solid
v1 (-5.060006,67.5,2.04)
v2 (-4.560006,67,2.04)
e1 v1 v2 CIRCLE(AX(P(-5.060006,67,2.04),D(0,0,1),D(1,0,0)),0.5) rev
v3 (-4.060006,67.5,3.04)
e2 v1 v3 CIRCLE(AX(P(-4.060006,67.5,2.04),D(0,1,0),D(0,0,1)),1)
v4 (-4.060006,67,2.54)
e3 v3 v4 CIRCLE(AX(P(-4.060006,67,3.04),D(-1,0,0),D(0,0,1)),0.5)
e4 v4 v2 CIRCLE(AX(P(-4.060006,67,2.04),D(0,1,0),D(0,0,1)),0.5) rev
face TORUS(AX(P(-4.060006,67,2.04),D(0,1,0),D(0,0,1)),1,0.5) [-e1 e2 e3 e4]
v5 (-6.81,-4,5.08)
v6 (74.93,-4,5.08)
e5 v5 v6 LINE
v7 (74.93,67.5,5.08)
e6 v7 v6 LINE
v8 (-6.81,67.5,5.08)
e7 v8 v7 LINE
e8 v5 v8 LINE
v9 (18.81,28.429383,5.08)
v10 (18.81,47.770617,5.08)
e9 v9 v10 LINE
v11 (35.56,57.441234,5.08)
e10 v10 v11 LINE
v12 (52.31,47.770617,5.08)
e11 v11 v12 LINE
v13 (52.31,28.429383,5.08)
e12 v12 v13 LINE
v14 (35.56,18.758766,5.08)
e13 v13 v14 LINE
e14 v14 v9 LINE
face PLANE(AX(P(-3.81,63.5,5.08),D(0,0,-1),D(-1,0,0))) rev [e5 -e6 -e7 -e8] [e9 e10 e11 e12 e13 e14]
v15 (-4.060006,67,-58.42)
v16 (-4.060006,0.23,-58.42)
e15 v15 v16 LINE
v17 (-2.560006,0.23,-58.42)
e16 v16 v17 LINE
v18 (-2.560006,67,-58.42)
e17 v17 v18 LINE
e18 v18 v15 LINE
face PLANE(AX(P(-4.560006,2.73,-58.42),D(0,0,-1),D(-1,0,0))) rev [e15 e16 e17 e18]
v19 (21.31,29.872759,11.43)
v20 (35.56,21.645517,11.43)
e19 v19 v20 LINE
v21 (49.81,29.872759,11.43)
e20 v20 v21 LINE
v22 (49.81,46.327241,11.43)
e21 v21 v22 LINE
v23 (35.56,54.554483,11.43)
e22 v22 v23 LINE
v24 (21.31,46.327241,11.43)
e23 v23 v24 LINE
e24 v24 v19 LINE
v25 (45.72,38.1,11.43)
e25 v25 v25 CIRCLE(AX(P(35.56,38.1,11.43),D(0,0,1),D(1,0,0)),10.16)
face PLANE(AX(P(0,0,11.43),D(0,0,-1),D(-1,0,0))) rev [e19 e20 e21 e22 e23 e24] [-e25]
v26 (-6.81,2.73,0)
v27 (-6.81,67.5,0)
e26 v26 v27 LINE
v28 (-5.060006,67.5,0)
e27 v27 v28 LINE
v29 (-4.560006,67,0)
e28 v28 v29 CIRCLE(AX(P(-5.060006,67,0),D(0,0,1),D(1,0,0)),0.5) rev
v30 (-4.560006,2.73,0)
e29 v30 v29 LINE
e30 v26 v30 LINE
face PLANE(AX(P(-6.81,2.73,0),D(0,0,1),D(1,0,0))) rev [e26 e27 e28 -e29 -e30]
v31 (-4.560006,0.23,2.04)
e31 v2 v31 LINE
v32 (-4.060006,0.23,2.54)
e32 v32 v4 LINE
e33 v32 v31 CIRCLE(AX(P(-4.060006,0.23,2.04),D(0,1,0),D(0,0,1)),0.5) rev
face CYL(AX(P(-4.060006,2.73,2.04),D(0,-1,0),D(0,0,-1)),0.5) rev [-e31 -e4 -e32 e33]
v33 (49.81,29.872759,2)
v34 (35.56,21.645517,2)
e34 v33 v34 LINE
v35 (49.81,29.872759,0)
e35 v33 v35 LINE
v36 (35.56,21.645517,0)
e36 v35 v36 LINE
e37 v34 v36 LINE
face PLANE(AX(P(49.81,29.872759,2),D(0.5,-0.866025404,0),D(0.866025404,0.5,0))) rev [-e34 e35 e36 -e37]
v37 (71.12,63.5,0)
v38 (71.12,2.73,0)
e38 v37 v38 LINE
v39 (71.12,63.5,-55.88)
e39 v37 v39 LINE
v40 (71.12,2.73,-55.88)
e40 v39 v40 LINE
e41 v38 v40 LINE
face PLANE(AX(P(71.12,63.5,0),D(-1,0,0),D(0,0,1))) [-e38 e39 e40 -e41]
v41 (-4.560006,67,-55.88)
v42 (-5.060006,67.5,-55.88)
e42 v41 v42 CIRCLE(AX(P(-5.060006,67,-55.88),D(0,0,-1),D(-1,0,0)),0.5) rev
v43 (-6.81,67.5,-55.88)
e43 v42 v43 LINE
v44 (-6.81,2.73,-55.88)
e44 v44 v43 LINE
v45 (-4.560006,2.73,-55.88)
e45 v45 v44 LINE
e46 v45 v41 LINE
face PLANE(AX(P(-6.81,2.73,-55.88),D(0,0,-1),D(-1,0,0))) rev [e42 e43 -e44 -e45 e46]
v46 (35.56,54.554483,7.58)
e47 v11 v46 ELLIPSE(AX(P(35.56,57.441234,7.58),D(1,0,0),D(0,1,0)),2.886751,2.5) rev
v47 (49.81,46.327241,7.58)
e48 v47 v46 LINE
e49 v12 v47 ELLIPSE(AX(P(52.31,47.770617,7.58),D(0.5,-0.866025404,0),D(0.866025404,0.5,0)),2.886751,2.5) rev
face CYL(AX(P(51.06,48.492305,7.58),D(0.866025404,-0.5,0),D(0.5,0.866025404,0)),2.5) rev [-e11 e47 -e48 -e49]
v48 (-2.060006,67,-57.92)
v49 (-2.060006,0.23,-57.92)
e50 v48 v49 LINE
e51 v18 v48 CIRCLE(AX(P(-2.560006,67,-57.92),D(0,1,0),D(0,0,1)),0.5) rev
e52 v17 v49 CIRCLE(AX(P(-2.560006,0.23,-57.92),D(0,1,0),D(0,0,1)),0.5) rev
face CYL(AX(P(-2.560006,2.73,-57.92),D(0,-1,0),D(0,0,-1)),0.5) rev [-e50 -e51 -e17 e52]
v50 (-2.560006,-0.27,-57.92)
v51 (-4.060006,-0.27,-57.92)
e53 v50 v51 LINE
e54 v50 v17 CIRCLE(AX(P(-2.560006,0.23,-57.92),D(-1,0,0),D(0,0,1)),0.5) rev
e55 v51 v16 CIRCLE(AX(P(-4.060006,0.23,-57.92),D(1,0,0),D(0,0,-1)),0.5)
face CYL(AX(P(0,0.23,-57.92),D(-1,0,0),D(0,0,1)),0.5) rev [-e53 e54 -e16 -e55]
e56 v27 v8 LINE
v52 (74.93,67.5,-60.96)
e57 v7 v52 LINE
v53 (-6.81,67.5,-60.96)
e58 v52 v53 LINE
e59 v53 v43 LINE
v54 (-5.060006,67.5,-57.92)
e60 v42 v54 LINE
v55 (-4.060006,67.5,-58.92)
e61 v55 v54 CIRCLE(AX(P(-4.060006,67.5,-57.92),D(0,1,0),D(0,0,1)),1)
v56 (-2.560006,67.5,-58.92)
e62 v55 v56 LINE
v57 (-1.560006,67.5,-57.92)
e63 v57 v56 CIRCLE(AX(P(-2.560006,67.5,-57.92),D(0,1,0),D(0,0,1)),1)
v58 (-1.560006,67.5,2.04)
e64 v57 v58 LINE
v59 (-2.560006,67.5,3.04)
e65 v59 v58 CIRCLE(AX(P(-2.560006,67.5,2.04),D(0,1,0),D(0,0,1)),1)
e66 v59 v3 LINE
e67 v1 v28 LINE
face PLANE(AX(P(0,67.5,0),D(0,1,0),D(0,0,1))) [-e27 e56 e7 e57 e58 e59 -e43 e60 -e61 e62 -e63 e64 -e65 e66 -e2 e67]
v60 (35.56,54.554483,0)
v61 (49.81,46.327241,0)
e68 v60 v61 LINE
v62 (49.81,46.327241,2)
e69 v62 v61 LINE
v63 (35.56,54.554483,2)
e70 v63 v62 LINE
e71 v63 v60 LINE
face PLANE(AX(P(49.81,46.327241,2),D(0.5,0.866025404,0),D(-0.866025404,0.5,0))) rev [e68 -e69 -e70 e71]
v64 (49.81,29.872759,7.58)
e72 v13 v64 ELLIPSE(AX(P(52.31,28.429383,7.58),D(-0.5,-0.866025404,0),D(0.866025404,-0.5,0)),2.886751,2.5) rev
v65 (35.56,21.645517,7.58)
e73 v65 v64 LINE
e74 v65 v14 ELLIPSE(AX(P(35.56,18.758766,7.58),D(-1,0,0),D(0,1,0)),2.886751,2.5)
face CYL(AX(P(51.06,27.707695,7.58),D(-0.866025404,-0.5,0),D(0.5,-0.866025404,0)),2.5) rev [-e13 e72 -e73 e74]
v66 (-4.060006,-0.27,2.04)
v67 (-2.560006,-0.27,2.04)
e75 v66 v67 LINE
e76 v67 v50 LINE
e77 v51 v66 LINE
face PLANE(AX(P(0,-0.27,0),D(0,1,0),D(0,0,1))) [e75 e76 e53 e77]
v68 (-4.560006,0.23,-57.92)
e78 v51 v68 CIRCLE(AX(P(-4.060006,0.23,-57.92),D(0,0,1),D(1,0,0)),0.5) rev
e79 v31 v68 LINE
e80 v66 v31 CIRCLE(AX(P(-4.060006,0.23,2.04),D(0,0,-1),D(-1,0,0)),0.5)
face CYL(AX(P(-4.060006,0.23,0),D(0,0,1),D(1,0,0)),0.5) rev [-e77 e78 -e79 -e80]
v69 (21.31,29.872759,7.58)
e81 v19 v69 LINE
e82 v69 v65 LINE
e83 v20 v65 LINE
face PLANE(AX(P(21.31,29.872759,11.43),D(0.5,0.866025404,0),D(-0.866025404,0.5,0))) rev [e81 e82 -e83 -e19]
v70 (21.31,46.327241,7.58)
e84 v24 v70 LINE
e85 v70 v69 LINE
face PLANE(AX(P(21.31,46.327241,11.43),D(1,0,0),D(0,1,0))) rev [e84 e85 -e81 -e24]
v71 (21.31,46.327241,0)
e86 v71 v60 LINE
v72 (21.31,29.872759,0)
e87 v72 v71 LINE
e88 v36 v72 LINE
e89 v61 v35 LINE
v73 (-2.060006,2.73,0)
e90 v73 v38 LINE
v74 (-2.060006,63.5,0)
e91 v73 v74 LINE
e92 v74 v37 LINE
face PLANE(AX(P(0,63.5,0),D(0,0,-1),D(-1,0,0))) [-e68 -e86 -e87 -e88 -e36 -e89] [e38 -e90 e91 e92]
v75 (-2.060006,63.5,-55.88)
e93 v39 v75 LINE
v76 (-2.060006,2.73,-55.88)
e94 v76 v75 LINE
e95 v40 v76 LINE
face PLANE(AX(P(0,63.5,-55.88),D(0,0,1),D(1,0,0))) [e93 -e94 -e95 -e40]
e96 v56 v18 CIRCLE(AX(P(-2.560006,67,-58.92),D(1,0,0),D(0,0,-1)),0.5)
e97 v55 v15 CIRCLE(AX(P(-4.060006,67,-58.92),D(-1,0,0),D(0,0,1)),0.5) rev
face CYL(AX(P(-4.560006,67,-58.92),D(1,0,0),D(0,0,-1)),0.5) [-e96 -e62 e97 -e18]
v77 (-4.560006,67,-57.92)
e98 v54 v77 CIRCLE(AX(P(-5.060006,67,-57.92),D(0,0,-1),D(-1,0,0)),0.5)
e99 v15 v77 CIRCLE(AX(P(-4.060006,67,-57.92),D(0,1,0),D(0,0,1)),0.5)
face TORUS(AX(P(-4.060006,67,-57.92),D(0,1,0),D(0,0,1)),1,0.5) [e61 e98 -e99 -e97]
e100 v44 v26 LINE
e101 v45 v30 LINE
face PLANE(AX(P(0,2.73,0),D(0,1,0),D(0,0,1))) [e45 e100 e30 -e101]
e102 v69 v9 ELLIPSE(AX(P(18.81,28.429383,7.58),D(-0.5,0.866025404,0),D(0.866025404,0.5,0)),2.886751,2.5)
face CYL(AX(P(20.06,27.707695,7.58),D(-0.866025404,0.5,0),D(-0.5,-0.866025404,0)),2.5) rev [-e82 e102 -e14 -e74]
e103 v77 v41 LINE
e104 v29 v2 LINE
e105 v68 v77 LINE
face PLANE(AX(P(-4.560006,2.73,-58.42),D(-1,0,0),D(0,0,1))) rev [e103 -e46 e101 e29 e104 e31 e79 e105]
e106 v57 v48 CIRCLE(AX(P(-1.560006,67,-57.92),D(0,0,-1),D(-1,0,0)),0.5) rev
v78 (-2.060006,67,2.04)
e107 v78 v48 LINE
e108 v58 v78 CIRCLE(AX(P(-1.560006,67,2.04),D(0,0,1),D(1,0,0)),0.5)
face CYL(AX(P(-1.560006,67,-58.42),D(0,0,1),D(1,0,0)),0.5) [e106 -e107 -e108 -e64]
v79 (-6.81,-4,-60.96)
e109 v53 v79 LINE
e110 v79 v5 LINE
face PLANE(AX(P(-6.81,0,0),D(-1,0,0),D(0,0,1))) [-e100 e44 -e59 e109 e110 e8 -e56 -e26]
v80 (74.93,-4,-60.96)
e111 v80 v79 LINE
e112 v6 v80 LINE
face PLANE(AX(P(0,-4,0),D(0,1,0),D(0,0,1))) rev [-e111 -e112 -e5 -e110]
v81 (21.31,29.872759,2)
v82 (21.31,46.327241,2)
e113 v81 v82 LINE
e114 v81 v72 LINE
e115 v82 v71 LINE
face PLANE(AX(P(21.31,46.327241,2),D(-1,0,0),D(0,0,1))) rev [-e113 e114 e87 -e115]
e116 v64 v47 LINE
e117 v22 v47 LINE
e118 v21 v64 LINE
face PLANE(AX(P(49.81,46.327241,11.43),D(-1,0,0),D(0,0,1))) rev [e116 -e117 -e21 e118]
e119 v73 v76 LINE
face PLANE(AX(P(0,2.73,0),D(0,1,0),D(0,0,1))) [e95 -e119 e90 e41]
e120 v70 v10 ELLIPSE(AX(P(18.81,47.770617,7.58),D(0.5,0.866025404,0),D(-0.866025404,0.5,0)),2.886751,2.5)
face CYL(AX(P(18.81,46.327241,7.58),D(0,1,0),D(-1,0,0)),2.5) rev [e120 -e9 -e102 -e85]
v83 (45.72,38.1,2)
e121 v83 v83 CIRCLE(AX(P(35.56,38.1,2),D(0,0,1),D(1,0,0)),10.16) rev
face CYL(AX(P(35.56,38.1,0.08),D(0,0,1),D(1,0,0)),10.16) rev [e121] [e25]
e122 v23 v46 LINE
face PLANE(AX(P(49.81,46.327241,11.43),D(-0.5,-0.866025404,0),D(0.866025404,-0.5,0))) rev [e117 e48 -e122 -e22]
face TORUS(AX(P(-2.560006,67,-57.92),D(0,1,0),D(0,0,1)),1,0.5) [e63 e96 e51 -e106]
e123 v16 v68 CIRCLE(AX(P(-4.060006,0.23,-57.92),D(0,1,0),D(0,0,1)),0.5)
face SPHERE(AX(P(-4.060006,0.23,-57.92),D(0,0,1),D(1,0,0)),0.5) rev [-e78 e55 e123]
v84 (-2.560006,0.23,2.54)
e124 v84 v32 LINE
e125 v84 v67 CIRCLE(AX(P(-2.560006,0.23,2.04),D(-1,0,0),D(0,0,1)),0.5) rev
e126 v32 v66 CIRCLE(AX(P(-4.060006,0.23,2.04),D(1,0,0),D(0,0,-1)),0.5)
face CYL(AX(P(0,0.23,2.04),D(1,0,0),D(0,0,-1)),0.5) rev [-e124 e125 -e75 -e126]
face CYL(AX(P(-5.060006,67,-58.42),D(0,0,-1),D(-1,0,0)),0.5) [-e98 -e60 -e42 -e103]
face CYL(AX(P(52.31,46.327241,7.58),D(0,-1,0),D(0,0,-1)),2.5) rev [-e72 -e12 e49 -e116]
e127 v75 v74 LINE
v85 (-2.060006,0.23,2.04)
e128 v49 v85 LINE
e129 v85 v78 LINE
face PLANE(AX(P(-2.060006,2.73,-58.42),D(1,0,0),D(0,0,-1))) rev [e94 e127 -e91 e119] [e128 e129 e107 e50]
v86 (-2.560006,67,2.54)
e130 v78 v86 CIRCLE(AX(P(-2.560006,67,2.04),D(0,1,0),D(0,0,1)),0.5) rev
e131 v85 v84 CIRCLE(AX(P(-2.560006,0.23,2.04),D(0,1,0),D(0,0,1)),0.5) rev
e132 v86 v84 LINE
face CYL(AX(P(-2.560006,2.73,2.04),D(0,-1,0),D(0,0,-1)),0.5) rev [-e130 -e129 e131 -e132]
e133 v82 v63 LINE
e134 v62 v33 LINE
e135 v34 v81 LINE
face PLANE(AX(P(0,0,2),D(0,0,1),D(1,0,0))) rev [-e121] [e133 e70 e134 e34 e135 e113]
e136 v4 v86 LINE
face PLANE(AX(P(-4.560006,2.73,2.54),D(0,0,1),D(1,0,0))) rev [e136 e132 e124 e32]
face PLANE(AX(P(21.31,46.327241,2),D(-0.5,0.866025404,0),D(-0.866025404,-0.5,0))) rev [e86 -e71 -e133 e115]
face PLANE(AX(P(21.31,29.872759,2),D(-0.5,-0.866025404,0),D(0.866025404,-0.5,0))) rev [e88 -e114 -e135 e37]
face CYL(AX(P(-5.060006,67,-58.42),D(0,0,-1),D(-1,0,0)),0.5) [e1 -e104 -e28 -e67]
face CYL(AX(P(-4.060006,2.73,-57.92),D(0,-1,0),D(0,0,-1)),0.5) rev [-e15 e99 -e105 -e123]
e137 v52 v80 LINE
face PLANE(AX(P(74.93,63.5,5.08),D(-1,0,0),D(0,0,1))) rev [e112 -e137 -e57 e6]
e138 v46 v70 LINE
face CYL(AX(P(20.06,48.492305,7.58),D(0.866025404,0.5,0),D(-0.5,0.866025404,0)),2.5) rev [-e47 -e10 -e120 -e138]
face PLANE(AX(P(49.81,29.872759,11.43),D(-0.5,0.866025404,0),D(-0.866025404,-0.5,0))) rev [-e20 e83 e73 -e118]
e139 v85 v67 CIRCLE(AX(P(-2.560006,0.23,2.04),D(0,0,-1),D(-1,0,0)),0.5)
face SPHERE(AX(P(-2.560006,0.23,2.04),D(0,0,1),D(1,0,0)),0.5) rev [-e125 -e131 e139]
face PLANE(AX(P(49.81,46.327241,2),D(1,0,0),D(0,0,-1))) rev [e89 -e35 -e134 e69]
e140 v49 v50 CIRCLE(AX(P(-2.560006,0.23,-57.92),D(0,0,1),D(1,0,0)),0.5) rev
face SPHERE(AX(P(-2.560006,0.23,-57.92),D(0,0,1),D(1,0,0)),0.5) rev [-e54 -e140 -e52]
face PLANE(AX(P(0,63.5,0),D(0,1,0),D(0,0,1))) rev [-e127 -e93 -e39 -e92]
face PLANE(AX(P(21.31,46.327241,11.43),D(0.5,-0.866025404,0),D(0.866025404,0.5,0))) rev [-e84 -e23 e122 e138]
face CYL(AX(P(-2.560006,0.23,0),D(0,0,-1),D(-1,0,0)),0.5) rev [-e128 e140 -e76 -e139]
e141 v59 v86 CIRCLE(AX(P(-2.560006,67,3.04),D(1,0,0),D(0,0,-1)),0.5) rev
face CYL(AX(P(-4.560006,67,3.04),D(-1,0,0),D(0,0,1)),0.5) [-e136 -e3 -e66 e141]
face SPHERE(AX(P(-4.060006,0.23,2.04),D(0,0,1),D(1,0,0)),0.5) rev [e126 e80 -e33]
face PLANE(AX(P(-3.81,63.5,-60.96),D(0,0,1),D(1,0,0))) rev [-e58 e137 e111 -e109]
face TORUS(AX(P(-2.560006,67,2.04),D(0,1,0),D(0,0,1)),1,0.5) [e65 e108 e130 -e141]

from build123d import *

# Parameters (mm, degrees)
SKETCH1_W            = 78.74
SKETCH1_H            = 66.04
SKETCH1_W_2          = 71.12
SKETCH1_H_2          = 55.88
BOSS_EXTRUDE1_DEPTH  = 63.5
SKETCH2_W            = 78.74
SKETCH2_H            = 66.04
BOSS_EXTRUDE2_DEPTH  = 4
CUT_EXTRUDE1_REACH   = 120.103
SKETCH3_W            = 13.462
SKETCH3_H            = 13.97
CUT_EXTRUDE2_REACH   = 120.103
SKETCH4_W            = 10.922
SKETCH4_H            = 13.97
SKETCH16_W           = 66.04
SKETCH16_H           = 67.5
SKETCH16_W_2         = 13.462
SKETCH16_H_2         = 13.97
SKETCH16_W_3         = 10.922
BOSS_EXTRUDE8_DEPTH  = 3
SKETCH17_W           = 81.74
SKETCH17_H           = 66.04
BOSS_EXTRUDE9_DEPTH  = 4
CUT_EXTRUDE10_DEPTH  = 64.77
SKETCH19_W           = 2.5
SKETCH19_H           = 60.96
CUT_EXTRUDE11_DEPTH  = 3
SKETCH20_W           = 55.88
SKETCH20_H           = 4
BOSS_EXTRUDE10_DEPTH = 2.25
SKETCH21_W           = 71.12
SKETCH21_H           = 55.88
BOSS_EXTRUDE11_DEPTH = 2.73
FILLET2_R            = 0.5
BOSS_EXTRUDE12_DEPTH = 6.35
SKETCH22_R           = 10.16
CUT_EXTRUDE12_DEPTH  = 11.35
CUT_EXTRUDE13_DEPTH  = 2
FILLET3_R            = 2.5


with BuildPart() as part:
    # Sketch1 → Boss-Extrude1 (new body)
    with BuildSketch(Plane(origin=(0, 0, 0), x_dir=(1, 0, 0), z_dir=(0, 1, 0))):
        with Locations((35.56, 27.94)):
            Rectangle(SKETCH1_W, SKETCH1_H)
        with Locations((35.56, 27.94)):
            Rectangle(SKETCH1_W_2, SKETCH1_H_2, mode=Mode.SUBTRACT)
    extrude(amount=BOSS_EXTRUDE1_DEPTH)

    # Sketch2 → Boss-Extrude2 (add)
    with BuildSketch(Plane(origin=(0, 0, 0), x_dir=(1, 0, 0), z_dir=(0, 1, 0))):
        with Locations((35.56, 27.94)):
            Rectangle(SKETCH2_W, SKETCH2_H)
    extrude(amount=-BOSS_EXTRUDE2_DEPTH)

    # Sketch3 → Cut-Extrude1 (cut, up to next)
    with BuildSketch(Plane.ZY.offset(3.81), mode=Mode.PRIVATE) as cut_extrude1_sk1:
        with Locations((-40.729, 11.875)):
            Rectangle(SKETCH3_W, SKETCH3_H)
    cut_extrude1_tool1 = extrude(cut_extrude1_sk1.sketch, amount=-CUT_EXTRUDE1_REACH, mode=Mode.PRIVATE) & part.part
    add(cut_extrude1_tool1.solids().sort_by_distance((-3.81, 11.875, -40.729))[0], mode=Mode.SUBTRACT)

    # Sketch4 → Cut-Extrude2 (cut, up to next)
    with BuildSketch(Plane.ZY.offset(3.81), mode=Mode.PRIVATE) as cut_extrude2_sk1:
        with Locations((-8.001, 11.875)):
            Rectangle(SKETCH4_W, SKETCH4_H)
    cut_extrude2_tool1 = extrude(cut_extrude2_sk1.sketch, amount=-CUT_EXTRUDE2_REACH, mode=Mode.PRIVATE) & part.part
    add(cut_extrude2_tool1.solids().sort_by_distance((-3.81, 11.875, -8.001))[0], mode=Mode.SUBTRACT)

    # Sketch16 → Boss-Extrude8 (add)
    with BuildSketch(Plane.ZY.offset(3.81)):
        with Locations((-27.94, 29.75)):
            Rectangle(SKETCH16_W, SKETCH16_H)
        with Locations((-40.729, 11.875)):
            Rectangle(SKETCH16_W_2, SKETCH16_H_2, mode=Mode.SUBTRACT)
        with Locations((-8.001, 11.875)):
            Rectangle(SKETCH16_W_3, SKETCH16_H_2, mode=Mode.SUBTRACT)
    extrude(amount=BOSS_EXTRUDE8_DEPTH)

    # Sketch17 → Boss-Extrude9 (add)
    with BuildSketch(Plane(origin=(0, 63.5, 0), x_dir=(1, 0, 0), z_dir=(0, 1, 0))):
        with Locations((34.06, 27.94)):
            Rectangle(SKETCH17_W, SKETCH17_H)
    extrude(amount=BOSS_EXTRUDE9_DEPTH)

    # Sketch18 → Cut-Extrude10 (cut)
    with BuildSketch(Plane(origin=(0, 67.5, 0), x_dir=(1, 0, 0), z_dir=(0, 1, 0))):
        Polygon((-4.560006, 58.42), (-2.060006, 58.42), (-2.060006, 55.88), (0.189988, 55.88), (0.189988, 0), (-2.060006, 0), (-2.060006, -2.54), (-4.560006, -2.54), (-4.560006, 0), (-6.81, 0), (-6.81, 55.88), (-4.560006, 55.88), align=None)
    extrude(amount=-CUT_EXTRUDE10_DEPTH, mode=Mode.SUBTRACT)

    # Sketch19 → Cut-Extrude11 (cut)
    with BuildSketch(Plane(origin=(0, 2.73, 0), x_dir=(1, 0, 0), z_dir=(0, 1, 0))):
        with Locations((-3.310006, 27.94)):
            Rectangle(SKETCH19_W, SKETCH19_H)
    extrude(amount=-CUT_EXTRUDE11_DEPTH, mode=Mode.SUBTRACT)

    # Sketch20 → Boss-Extrude10 (add)
    with BuildSketch(Plane.ZY.offset(-0.189988)):
        with Locations((-27.94, 65.5)):
            Rectangle(SKETCH20_W, SKETCH20_H)
    extrude(amount=BOSS_EXTRUDE10_DEPTH)

    # Sketch21 → Boss-Extrude11 (add)
    with BuildSketch(Plane(origin=(0, 0, 0), x_dir=(1, 0, 0), z_dir=(0, 1, 0))):
        with Locations((35.56, 27.94)):
            Rectangle(SKETCH21_W, SKETCH21_H)
    extrude(amount=BOSS_EXTRUDE11_DEPTH)

    # Fillet2
    fillet2_edges = [part.edges().sort_by_distance(p)[0] for p in [
        (-2.060006, 33.615, -58.42),
    ]]
    fillet(fillet2_edges, radius=FILLET2_R)
    fillet2_2_edges = [part.edges().sort_by_distance(p)[0] for p in [
        (-2.060006, -0.27, -27.69),
    ]]
    fillet(fillet2_2_edges, radius=FILLET2_R)
    fillet2_3_edges = [part.edges().sort_by_distance(p)[0] for p in [
        (-2.060006, 33.865, 2.54),
    ]]
    fillet(fillet2_3_edges, radius=FILLET2_R)
    fillet2_4_edges = [part.edges().sort_by_distance(p)[0] for p in [
        (-4.560006, 33.865, 2.54),
    ]]
    fillet(fillet2_4_edges, radius=FILLET2_R)
    fillet2_5_edges = [part.edges().sort_by_distance(p)[0] for p in [
        (-3.310006, 67.5, 2.54),
    ]]
    fillet(fillet2_5_edges, radius=FILLET2_R)
    fillet2_6_edges = [part.edges().sort_by_distance(p)[0] for p in [
        (-4.560006, 67.5, -56.9),
    ]]
    fillet(fillet2_6_edges, radius=FILLET2_R)
    fillet2_7_edges = [part.edges().sort_by_distance(p)[0] for p in [
        (-2.060012, 67.5, -27.94),
    ]]
    fillet(fillet2_7_edges, radius=FILLET2_R - 0.0001)  # a hair under: the kernel refuses the full size

    # Sketch11 → Boss-Extrude12 (add)
    with BuildSketch(Plane.XY.offset(5.08)):
        Polygon((49.81, 46.327241336), (49.81, 29.872758664), (35.56, 21.645517328), (21.31, 29.872758664), (21.31, 46.327241336), (35.56, 54.554482672), align=None)
    extrude(amount=BOSS_EXTRUDE12_DEPTH)

    # Sketch22 → Cut-Extrude12 (cut)
    with BuildSketch(Plane.XY.offset(11.43)):
        with Locations((35.56, 38.1)):
            Circle(SKETCH22_R)
    extrude(amount=-CUT_EXTRUDE12_DEPTH, mode=Mode.SUBTRACT)

    # Sketch23 → Cut-Extrude13 (cut)
    with BuildSketch(Plane(origin=(0, 0, 0), x_dir=(-1, 0, 0), z_dir=(0, 0, -1))):
        Polygon((-21.31, 46.327241336), (-21.31, 29.872758664), (-35.56, 21.645517328), (-49.81, 29.872758664), (-49.81, 46.327241336), (-35.56, 54.554482672), align=None)
    extrude(amount=-CUT_EXTRUDE13_DEPTH, mode=Mode.SUBTRACT)

    # Fillet3
    fillet3_edges = [part.edges().sort_by_distance(p)[0] for p in [
        (42.685, 50.440862004, 5.08),
        (28.435, 50.440862004, 5.08),
        (21.31, 38.1, 5.08),
        (28.435, 25.759137996, 5.08),
        (42.685, 25.759137996, 5.08),
        (49.81, 38.1, 5.08),
    ]]
    fillet(fillet3_edges, radius=FILLET3_R)


solid = part.part
